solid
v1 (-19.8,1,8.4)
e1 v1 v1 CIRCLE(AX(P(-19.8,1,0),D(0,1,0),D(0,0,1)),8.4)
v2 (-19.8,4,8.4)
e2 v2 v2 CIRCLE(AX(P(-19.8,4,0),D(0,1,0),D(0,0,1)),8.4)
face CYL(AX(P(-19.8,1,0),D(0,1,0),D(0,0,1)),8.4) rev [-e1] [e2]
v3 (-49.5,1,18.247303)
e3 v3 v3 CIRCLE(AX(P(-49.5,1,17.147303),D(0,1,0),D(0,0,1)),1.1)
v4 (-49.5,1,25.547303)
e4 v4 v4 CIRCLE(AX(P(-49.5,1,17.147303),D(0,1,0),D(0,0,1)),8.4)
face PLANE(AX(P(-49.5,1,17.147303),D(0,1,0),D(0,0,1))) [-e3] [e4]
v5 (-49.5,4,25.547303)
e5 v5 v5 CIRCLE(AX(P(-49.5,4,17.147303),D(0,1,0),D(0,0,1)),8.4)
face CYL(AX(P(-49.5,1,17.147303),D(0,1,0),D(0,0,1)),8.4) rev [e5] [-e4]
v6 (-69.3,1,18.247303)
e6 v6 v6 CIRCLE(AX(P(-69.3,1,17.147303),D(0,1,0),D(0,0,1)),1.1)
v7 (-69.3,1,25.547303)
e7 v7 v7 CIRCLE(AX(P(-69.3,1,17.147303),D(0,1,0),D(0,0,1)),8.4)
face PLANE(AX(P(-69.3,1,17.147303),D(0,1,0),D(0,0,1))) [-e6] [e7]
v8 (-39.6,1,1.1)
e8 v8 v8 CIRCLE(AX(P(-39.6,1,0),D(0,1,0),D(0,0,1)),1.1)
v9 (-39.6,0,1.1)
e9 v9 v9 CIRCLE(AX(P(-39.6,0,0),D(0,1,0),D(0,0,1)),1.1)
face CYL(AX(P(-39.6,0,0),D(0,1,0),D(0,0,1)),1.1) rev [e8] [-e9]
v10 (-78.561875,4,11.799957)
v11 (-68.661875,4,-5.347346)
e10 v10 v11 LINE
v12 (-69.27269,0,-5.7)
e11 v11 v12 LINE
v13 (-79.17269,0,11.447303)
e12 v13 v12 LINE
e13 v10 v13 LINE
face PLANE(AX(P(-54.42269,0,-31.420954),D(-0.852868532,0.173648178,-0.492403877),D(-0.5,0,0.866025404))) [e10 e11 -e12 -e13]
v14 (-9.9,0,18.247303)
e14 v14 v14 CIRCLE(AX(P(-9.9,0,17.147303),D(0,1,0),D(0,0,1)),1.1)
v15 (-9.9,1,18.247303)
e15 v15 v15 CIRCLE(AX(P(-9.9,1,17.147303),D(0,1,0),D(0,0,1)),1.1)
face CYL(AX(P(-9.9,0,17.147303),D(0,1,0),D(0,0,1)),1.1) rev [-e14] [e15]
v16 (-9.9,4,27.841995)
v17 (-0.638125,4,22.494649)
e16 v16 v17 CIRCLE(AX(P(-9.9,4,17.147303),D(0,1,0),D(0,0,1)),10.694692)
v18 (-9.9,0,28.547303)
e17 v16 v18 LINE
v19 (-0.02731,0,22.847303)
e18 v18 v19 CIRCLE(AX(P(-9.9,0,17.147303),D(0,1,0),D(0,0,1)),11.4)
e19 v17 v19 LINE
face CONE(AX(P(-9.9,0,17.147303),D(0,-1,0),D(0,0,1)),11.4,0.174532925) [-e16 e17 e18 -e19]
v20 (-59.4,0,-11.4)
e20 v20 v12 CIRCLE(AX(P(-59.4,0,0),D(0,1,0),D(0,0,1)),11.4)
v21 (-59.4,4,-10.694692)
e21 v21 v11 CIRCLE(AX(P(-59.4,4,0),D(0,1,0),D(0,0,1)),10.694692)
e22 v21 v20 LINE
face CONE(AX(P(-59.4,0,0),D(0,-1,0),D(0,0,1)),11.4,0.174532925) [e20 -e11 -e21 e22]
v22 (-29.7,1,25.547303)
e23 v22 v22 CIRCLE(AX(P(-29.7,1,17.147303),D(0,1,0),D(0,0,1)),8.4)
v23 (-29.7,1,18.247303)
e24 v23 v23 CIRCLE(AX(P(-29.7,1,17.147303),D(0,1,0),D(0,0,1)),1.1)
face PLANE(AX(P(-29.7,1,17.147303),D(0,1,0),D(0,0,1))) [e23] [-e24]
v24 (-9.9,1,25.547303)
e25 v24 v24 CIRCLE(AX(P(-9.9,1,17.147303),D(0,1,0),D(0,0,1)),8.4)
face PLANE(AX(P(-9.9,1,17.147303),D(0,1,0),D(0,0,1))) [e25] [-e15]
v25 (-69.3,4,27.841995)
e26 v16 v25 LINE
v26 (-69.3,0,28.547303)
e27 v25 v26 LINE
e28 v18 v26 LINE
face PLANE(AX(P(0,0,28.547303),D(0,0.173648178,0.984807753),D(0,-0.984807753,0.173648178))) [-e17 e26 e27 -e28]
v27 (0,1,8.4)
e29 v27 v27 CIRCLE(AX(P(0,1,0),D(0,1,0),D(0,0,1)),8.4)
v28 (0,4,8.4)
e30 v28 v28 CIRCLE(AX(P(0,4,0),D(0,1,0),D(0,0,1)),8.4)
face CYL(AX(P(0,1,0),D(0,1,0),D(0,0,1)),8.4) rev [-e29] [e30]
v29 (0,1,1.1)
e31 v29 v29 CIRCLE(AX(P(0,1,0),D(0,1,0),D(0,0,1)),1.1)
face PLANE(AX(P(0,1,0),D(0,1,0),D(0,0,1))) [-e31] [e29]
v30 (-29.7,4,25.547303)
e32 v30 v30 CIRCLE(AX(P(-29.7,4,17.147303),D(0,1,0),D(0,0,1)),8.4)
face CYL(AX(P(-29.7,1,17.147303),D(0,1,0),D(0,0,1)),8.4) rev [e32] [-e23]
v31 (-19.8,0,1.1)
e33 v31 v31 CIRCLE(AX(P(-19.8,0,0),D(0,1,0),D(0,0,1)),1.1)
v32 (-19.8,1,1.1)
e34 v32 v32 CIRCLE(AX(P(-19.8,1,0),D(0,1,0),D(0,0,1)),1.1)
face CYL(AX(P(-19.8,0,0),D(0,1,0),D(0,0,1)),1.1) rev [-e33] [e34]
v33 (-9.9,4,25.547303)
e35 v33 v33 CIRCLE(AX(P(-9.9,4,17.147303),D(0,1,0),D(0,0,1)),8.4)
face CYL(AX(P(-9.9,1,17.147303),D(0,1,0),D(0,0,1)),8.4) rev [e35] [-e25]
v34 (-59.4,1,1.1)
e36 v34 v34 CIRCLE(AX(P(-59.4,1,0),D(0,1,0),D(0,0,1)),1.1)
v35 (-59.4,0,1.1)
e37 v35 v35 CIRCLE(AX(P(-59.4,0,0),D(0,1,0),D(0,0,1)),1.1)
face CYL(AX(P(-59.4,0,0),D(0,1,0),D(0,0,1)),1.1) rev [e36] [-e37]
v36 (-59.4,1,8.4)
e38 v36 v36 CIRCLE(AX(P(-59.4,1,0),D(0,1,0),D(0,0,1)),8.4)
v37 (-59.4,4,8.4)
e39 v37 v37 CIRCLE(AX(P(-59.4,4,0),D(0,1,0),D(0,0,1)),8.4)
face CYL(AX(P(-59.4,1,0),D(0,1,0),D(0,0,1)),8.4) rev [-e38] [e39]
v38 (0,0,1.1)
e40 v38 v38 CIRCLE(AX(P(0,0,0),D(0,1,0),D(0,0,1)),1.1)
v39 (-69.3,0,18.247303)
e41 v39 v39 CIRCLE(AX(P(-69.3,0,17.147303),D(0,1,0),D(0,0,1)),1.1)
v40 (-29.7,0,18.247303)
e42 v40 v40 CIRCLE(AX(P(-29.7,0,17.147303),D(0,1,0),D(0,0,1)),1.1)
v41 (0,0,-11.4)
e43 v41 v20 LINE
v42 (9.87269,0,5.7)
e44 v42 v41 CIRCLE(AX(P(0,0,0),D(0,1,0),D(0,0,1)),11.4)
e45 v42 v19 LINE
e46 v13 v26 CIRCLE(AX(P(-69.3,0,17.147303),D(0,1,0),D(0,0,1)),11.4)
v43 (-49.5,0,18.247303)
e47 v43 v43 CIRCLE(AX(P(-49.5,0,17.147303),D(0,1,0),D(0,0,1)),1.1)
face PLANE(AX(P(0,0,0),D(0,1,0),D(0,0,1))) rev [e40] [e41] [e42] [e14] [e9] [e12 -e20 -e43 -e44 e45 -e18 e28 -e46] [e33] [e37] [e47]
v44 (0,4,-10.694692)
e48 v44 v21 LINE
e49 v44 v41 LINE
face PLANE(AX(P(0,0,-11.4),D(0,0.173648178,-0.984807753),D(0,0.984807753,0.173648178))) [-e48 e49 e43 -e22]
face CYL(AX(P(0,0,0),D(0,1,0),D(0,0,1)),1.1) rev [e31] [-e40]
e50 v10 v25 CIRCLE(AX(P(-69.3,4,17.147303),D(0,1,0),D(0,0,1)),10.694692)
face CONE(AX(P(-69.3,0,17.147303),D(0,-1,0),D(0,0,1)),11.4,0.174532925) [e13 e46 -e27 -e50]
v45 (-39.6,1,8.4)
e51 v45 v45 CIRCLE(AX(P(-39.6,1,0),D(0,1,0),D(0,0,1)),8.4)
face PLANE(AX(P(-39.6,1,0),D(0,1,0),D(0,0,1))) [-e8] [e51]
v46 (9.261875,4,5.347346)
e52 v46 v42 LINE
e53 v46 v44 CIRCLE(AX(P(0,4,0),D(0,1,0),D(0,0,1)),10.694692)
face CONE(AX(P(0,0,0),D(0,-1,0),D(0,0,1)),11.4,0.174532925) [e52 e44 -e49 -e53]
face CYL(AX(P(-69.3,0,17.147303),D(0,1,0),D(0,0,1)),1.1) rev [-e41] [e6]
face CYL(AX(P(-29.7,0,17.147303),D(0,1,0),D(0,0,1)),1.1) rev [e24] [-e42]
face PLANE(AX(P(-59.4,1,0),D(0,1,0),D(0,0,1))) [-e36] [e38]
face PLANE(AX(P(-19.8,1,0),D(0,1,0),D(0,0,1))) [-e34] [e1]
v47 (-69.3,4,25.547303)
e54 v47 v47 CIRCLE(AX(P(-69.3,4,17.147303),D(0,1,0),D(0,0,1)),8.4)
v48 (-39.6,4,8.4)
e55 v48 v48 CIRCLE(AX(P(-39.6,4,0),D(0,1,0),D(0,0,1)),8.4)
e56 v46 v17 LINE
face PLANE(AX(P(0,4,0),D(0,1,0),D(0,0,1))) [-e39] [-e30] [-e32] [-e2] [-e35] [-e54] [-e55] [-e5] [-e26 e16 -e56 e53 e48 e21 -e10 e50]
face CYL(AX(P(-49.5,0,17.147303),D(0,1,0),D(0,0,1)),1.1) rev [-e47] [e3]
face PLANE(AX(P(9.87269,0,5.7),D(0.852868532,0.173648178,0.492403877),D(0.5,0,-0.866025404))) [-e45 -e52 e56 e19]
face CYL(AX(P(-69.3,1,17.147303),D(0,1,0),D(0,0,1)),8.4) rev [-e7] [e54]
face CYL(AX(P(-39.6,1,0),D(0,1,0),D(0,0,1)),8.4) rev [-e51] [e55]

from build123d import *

# Parameters (mm, degrees)
BOSS_EXTRUDE1_DEPTH = 4
BOSS_EXTRUDE1_DRAFT = 10
CUT_EXTRUDE1_START  = 4
SKETCH1_3_R         = 1.1
CUT_EXTRUDE1_DEPTH  = 4
CUT_EXTRUDE2_START  = 4
SKETCH1_4_R         = 8.4
SKETCH1_4_R_2       = 1.1
CUT_EXTRUDE2_DEPTH  = 3


# Read off the part's stored shape, not the designer's step: Boss-Extrude1
with BuildPart() as part:
    # Boss-Extrude1 outline → Boss-Extrude1 (with draft: the straight prism first)
    with BuildSketch(Plane(origin=(0, 4, 0), x_dir=(1, 0, 0), z_dir=(0, 1, 0))):
        with BuildLine():
            ThreePointArc((-78.561875024, -11.799956956), (-78.561875024, -22.494649034), (-69.3, -27.841995072))
            Line((-69.3, -27.841995072), (-9.9, -27.841995072))
            ThreePointArc((-9.9, -27.841995072), (-4.552653961, -26.409178019), (-0.638124976, -22.494649034))
            Line((-0.638124976, -22.494649034), (9.261875024, -5.347346039))
            ThreePointArc((9.261875024, -5.347346039), (9.261875024, 5.347346039), (0, 10.694692077))
            Line((0, 10.694692077), (-59.4, 10.694692077))
            ThreePointArc((-59.4, 10.694692077), (-64.747346039, 9.261875024), (-68.661875024, 5.347346039))
            Line((-68.661875024, 5.347346039), (-78.561875024, -11.799956956))
        make_face()
    extrude(amount=-BOSS_EXTRUDE1_DEPTH)
    # Boss-Extrude1: the draft: its side faces are tilted about the plane it starts from
    boss_extrude1_sides = [part.faces().sort_by_distance(p)[0] for p in [
        (-73.611875024, 2, 3.226305459),
        (-78.561875024, 2, 22.494649033),
        (-39.6, 2, 27.841995072),
        (-4.552653962, 2, 26.409178019),
        (4.311875024, 2, 13.920997536),
        (9.261875024, 2, -5.347346038),
        (-29.7, 2, -10.694692077),
        (-64.747346038, 2, -9.261875024),
    ]]
    draft(boss_extrude1_sides, Plane(origin=(0, 4, 0), x_dir=(1, 0, 0), z_dir=(0, 1, 0)), BOSS_EXTRUDE1_DRAFT)

    # Sketch1<3> → Cut-Extrude1 (cut)
    with BuildSketch(Plane(origin=(0, 0, 0), x_dir=(1, 0, 0), z_dir=(0, 1, 0)).offset(CUT_EXTRUDE1_START)):
        with Locations(Location((-9.9, -17.147302995, 0), (0, 0, 270))):
            Circle(SKETCH1_3_R)
        with Locations(Location((0, 0, 0), (0, 0, 270))):
            Circle(SKETCH1_3_R)
        with Locations(Location((-29.7, -17.147302995, 0), (0, 0, 270))):
            Circle(SKETCH1_3_R)
        with Locations(Location((-39.6, 0, 0), (0, 0, 270))):
            Circle(SKETCH1_3_R)
        with Locations(Location((-49.5, -17.147302995, 0), (0, 0, 270))):
            Circle(SKETCH1_3_R)
        with Locations(Location((-59.4, 0, 0), (0, 0, 270))):
            Circle(SKETCH1_3_R)
        with Locations(Location((-69.3, -17.147302995, 0), (0, 0, 270))):
            Circle(SKETCH1_3_R)
        with Locations(Location((-19.8, 0, 0), (0, 0, 270))):
            Circle(SKETCH1_3_R)
    extrude(amount=-CUT_EXTRUDE1_DEPTH, mode=Mode.SUBTRACT)

    # Sketch1<4> → Cut-Extrude2 (cut)
    # profile 1 of 8: a face of its own
    with BuildSketch(Plane(origin=(0, 0, 0), x_dir=(1, 0, 0), z_dir=(0, 1, 0)).offset(CUT_EXTRUDE2_START)):
        with Locations(Location((-19.8, 0, 0), (0, 0, 270))):
            Circle(SKETCH1_4_R)
        with Locations(Location((-19.8, 0, 0), (0, 0, 270))):
            Circle(SKETCH1_4_R_2, mode=Mode.SUBTRACT)
    # profile 2 of 8: a face of its own
    with BuildSketch(Plane(origin=(0, 0, 0), x_dir=(1, 0, 0), z_dir=(0, 1, 0)).offset(CUT_EXTRUDE2_START)):
        with Locations(Location((-9.9, -17.147302995, 0), (0, 0, 270))):
            Circle(SKETCH1_4_R)
        with Locations(Location((-9.9, -17.147302995, 0), (0, 0, 270))):
            Circle(SKETCH1_4_R_2, mode=Mode.SUBTRACT)
    # profile 3 of 8: a face of its own
    with BuildSketch(Plane(origin=(0, 0, 0), x_dir=(1, 0, 0), z_dir=(0, 1, 0)).offset(CUT_EXTRUDE2_START)):
        with Locations(Location((0, 0, 0), (0, 0, 270))):
            Circle(SKETCH1_4_R)
        with Locations(Location((0, 0, 0), (0, 0, 270))):
            Circle(SKETCH1_4_R_2, mode=Mode.SUBTRACT)
    # profile 4 of 8: a face of its own
    with BuildSketch(Plane(origin=(0, 0, 0), x_dir=(1, 0, 0), z_dir=(0, 1, 0)).offset(CUT_EXTRUDE2_START)):
        with Locations(Location((-29.7, -17.147302995, 0), (0, 0, 270))):
            Circle(SKETCH1_4_R)
        with Locations(Location((-29.7, -17.147302995, 0), (0, 0, 270))):
            Circle(SKETCH1_4_R_2, mode=Mode.SUBTRACT)
    # profile 5 of 8: a face of its own
    with BuildSketch(Plane(origin=(0, 0, 0), x_dir=(1, 0, 0), z_dir=(0, 1, 0)).offset(CUT_EXTRUDE2_START)):
        with Locations(Location((-39.6, 0, 0), (0, 0, 270))):
            Circle(SKETCH1_4_R)
        with Locations(Location((-39.6, 0, 0), (0, 0, 270))):
            Circle(SKETCH1_4_R_2, mode=Mode.SUBTRACT)
    # profile 6 of 8: a face of its own
    with BuildSketch(Plane(origin=(0, 0, 0), x_dir=(1, 0, 0), z_dir=(0, 1, 0)).offset(CUT_EXTRUDE2_START)):
        with Locations(Location((-49.5, -17.147302995, 0), (0, 0, 270))):
            Circle(SKETCH1_4_R)
        with Locations(Location((-49.5, -17.147302995, 0), (0, 0, 270))):
            Circle(SKETCH1_4_R_2, mode=Mode.SUBTRACT)
    # profile 7 of 8: a face of its own
    with BuildSketch(Plane(origin=(0, 0, 0), x_dir=(1, 0, 0), z_dir=(0, 1, 0)).offset(CUT_EXTRUDE2_START)):
        with Locations(Location((-59.4, 0, 0), (0, 0, 270))):
            Circle(SKETCH1_4_R)
        with Locations(Location((-59.4, 0, 0), (0, 0, 270))):
            Circle(SKETCH1_4_R_2, mode=Mode.SUBTRACT)
    # profile 8 of 8: a face of its own
    with BuildSketch(Plane(origin=(0, 0, 0), x_dir=(1, 0, 0), z_dir=(0, 1, 0)).offset(CUT_EXTRUDE2_START)):
        with Locations(Location((-69.3, -17.147302995, 0), (0, 0, 270))):
            Circle(SKETCH1_4_R)
        with Locations(Location((-69.3, -17.147302995, 0), (0, 0, 270))):
            Circle(SKETCH1_4_R_2, mode=Mode.SUBTRACT)
    extrude(amount=-CUT_EXTRUDE2_DEPTH, mode=Mode.SUBTRACT)


solid = part.part
